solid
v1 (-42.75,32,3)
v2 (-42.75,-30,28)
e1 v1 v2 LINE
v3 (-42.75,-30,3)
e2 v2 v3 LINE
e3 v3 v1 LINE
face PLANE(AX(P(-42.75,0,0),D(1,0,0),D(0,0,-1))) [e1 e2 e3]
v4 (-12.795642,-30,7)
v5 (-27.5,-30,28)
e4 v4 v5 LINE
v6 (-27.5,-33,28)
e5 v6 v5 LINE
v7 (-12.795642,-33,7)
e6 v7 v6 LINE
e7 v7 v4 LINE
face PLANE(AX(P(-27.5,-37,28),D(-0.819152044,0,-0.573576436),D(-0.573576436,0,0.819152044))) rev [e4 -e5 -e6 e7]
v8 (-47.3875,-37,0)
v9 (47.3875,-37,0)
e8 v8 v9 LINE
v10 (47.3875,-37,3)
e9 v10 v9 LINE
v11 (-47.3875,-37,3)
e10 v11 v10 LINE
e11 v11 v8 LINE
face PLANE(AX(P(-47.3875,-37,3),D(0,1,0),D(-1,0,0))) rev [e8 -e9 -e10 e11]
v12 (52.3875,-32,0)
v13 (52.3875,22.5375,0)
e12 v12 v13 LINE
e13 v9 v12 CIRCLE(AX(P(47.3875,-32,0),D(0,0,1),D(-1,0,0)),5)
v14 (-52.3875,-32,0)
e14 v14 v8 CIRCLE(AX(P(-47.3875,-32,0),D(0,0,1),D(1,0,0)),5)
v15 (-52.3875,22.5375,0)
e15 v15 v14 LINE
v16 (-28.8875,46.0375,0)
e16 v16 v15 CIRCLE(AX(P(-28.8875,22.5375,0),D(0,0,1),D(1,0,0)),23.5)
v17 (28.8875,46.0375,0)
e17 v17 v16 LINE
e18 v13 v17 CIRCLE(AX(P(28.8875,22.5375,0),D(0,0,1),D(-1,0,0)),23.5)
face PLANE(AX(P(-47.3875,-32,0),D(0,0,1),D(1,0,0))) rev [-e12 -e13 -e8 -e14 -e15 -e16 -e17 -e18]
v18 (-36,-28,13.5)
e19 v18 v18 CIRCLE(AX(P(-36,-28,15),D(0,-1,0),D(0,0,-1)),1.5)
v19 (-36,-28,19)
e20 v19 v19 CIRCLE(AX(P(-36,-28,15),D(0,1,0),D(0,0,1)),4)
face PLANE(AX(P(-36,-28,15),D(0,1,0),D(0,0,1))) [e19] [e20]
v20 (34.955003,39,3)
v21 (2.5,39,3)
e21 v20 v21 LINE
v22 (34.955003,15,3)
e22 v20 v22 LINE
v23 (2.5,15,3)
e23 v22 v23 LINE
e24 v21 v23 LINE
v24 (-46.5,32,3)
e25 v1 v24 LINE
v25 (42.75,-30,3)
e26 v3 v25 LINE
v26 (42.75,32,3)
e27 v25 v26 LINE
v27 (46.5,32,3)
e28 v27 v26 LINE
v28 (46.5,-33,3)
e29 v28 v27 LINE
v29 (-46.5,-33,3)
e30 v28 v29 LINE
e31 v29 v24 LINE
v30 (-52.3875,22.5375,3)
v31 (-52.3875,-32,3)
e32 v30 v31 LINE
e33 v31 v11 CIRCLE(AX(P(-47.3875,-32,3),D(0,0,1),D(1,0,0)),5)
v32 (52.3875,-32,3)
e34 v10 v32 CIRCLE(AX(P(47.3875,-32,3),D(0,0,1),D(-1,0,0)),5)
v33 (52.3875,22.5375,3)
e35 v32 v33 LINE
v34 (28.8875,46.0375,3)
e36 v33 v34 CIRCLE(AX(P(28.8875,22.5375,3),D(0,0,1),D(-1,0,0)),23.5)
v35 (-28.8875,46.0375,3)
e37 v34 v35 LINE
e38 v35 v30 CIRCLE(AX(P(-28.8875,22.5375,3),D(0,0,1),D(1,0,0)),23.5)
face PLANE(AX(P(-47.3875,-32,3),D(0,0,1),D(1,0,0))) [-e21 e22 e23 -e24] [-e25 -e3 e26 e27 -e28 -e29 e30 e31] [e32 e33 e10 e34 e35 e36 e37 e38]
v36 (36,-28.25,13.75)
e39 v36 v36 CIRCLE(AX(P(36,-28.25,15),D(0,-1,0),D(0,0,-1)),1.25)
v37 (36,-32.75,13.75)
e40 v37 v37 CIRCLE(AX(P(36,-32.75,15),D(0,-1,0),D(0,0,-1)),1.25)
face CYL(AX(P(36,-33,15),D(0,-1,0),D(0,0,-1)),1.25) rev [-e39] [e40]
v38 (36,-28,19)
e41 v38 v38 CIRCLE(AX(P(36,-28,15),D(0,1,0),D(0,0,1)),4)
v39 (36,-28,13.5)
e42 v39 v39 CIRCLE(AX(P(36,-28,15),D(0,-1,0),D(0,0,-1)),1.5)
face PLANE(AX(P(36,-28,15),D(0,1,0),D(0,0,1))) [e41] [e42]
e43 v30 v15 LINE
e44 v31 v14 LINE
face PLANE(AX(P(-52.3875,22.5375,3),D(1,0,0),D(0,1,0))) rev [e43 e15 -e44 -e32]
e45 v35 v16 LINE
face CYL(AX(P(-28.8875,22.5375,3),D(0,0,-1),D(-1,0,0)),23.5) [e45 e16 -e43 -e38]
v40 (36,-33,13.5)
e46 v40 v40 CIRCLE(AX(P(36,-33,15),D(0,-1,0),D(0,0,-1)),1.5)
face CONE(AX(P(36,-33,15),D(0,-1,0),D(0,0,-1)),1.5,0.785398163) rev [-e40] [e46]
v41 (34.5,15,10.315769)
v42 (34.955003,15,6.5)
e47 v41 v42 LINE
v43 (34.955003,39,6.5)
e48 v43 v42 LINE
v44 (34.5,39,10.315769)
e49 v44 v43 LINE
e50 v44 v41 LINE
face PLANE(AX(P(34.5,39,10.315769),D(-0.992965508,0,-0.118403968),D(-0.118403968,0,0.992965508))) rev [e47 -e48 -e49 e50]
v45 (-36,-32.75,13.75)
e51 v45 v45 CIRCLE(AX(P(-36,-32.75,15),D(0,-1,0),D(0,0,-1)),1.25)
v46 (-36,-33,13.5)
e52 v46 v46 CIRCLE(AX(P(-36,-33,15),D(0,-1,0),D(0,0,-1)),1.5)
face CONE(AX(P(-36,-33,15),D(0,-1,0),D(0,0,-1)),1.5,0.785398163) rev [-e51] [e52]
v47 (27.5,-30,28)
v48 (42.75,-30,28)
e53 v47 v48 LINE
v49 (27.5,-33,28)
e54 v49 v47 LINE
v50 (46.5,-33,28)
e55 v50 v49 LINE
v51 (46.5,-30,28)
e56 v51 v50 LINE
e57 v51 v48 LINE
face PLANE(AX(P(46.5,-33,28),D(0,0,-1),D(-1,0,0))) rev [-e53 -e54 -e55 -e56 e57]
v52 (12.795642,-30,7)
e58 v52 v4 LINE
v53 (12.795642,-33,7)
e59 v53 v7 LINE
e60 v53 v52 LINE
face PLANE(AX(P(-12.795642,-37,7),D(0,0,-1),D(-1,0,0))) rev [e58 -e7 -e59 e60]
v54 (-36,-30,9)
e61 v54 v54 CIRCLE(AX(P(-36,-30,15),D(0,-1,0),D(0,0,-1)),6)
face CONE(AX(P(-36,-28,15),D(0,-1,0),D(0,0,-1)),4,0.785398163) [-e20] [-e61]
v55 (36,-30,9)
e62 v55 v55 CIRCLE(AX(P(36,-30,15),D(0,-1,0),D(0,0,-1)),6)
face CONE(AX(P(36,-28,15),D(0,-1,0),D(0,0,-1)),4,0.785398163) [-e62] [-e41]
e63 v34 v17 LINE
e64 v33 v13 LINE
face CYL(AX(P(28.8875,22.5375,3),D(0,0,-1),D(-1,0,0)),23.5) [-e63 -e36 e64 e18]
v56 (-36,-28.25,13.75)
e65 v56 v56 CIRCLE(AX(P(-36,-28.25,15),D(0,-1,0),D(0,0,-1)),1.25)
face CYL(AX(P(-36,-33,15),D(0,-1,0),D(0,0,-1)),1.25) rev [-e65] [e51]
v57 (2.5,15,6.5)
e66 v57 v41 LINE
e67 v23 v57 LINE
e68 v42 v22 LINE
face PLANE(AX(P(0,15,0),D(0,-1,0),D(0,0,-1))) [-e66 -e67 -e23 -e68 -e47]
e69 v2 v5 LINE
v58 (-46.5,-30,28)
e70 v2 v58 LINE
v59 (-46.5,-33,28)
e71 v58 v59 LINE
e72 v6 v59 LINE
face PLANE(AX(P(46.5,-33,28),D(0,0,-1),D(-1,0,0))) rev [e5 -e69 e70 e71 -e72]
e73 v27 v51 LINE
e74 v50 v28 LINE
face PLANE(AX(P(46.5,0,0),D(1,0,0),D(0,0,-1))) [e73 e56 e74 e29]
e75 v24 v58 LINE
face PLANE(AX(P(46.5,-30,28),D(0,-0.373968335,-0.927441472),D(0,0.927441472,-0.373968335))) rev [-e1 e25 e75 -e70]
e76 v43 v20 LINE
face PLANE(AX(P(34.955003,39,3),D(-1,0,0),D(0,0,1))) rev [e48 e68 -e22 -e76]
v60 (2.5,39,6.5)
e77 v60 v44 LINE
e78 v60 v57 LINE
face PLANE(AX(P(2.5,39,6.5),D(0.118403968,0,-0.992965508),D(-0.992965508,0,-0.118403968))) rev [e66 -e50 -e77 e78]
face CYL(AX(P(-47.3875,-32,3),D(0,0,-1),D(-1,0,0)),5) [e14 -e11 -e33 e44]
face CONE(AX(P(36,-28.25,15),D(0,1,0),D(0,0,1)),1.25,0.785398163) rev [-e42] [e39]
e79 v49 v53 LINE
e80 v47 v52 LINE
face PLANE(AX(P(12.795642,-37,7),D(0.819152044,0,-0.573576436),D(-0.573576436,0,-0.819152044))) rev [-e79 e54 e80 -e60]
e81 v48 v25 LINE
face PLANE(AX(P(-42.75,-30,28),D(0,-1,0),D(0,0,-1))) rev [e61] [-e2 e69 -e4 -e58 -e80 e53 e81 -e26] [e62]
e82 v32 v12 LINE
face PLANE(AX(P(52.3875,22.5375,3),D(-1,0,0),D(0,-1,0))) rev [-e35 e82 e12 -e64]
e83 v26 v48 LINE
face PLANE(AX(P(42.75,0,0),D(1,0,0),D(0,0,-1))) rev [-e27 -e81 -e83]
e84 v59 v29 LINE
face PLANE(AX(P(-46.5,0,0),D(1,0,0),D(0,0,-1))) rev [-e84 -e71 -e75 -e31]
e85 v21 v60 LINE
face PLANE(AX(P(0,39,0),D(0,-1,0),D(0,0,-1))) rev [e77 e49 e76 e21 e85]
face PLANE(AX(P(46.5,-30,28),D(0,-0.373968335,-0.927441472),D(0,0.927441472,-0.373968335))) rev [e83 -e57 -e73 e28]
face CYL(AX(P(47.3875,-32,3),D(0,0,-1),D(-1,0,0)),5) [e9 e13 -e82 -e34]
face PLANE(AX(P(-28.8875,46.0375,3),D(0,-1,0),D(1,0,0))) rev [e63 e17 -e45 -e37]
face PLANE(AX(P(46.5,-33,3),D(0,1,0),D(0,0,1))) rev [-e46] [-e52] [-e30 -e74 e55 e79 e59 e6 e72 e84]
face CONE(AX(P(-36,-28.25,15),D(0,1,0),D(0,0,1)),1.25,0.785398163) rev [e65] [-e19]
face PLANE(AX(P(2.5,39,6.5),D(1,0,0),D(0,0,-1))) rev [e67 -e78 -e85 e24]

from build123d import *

# Parameters (mm, degrees)
PLATE_DEPTH               = 3
BRACKET_DEPTH             = 46.5
BRACKET_HOLLOW_DEPTH      = 42.75
SKETCH29_R                = 4
INSERT_BOSS_DEPTH         = 2
INSERT_CHAMFER_SIZE       = 2
M3_MOUNT_HOLES_AT_2_COUNT = 2
M3_MOUNT_HOLES_AT_2_PITCH = 72
CUT_EXTRUDE1_DEPTH        = 97.489126654
TOP_CAM_BOSS_START        = 15
TOP_CAM_BOSS_DEPTH        = 24


with BuildPart() as part:
    # Sketch1 → plate (new body)
    with BuildSketch(Plane.XY):
        with BuildLine():
            Line((-28.8875, 46.0375), (28.8875, 46.0375))
            ThreePointArc((28.8875, 46.0375), (45.504509358, 39.154509358), (52.3875, 22.5375))
            Line((52.3875, 22.5375), (52.3875, 0))
            Line((52.3875, 0), (52.3875, -32))
            ThreePointArc((52.3875, -32), (50.923033906, -35.535533906), (47.3875, -37))
            Line((47.3875, -37), (-47.3875, -37))
            ThreePointArc((-47.3875, -37), (-50.923033906, -35.535533906), (-52.3875, -32))
            Line((-52.3875, -32), (-52.3875, 0))
            Line((-52.3875, 0), (-52.3875, 22.5375))
            ThreePointArc((-52.3875, 22.5375), (-45.504509358, 39.154509358), (-28.8875, 46.0375))
        make_face()
    extrude(amount=PLATE_DEPTH)

    # Sketch9 → bracket (add, symmetric)
    with BuildSketch(Plane(origin=(0, 0, 0), x_dir=(0, 0, -1), z_dir=(1, 0, 0))):
        Polygon((-3, 32), (-3, -33), (-28, -33), (-28, -30), align=None)
    extrude(amount=BRACKET_DEPTH, both=True)

    # Sketch10 → bracket hollow (cut, symmetric)
    with BuildSketch(Plane(origin=(0, 0, 0), x_dir=(0, 0, -1), z_dir=(1, 0, 0))):
        Polygon((-28, -30), (-3, -30), (-3, 32), align=None)
    extrude(amount=BRACKET_HOLLOW_DEPTH, both=True, mode=Mode.SUBTRACT)

    # Sketch29 → insert boss (add)
    with BuildSketch(Plane(origin=(0, -30, 0), x_dir=(1, 0, 0), z_dir=(0, 1, 0))):
        with Locations(Location((36, -15, 0), (0, 0, 90))):
            Circle(SKETCH29_R)
        with Locations(Location((-36, -15, 0), (0, 0, 90))):
            Circle(SKETCH29_R)
    extrude(amount=INSERT_BOSS_DEPTH)

    # insert chamfer
    insert_chamfer_edges = [part.edges().sort_by_distance(p)[0] for p in [
        (36, -30, 19),
        (-36, -30, 19),
    ]]
    chamfer(insert_chamfer_edges, length=INSERT_CHAMFER_SIZE - 0.0001)  # a hair under: the kernel refuses the full size

    # Sketch12 → M3 mount holes (revolve, cut)
    with BuildSketch(Plane(origin=(36, -33, 15), x_dir=(0, 0, -1), z_dir=(1, 0, 0))):
        Polygon((0, 0), (0, 5), (1.5, 5), (1.25, 4.75), (1.25, 0.25), (1.5, 0), align=None)
    m3_mount_holes = revolve(axis=Axis((36, -39.35, 15), (0, 1, 0)), mode=Mode.SUBTRACT)

    # M3 mount holes at 2: M3 mount holes ×2
    with Locations(*[(-i * M3_MOUNT_HOLES_AT_2_PITCH, 0, 0) for i in range(1, M3_MOUNT_HOLES_AT_2_COUNT)]):
        add(m3_mount_holes, mode=Mode.SUBTRACT)

    # Sketch30 → Cut-Extrude1 (cut, through all)
    with BuildSketch(Plane(origin=(0, -30, 0), x_dir=(1, 0, 0), z_dir=(0, 1, 0))):
        Polygon((-27.5, -28), (-12.795641698, -7), (12.795641698, -7), (27.5, -28), align=None)
    extrude(amount=-CUT_EXTRUDE1_DEPTH, mode=Mode.SUBTRACT)

    # Sketch5 → top-cam-boss (add)
    with BuildSketch(Plane(origin=(0, 0, 0), x_dir=(1, 0, 0), z_dir=(0, 1, 0)).offset(TOP_CAM_BOSS_START)):
        Polygon((2.5, -6.5), (34.5, -10.315768982), (34.955002904, -6.5), (34.955002904, -3), (2.5, -3), align=None)
    extrude(amount=TOP_CAM_BOSS_DEPTH)


solid = part.part
